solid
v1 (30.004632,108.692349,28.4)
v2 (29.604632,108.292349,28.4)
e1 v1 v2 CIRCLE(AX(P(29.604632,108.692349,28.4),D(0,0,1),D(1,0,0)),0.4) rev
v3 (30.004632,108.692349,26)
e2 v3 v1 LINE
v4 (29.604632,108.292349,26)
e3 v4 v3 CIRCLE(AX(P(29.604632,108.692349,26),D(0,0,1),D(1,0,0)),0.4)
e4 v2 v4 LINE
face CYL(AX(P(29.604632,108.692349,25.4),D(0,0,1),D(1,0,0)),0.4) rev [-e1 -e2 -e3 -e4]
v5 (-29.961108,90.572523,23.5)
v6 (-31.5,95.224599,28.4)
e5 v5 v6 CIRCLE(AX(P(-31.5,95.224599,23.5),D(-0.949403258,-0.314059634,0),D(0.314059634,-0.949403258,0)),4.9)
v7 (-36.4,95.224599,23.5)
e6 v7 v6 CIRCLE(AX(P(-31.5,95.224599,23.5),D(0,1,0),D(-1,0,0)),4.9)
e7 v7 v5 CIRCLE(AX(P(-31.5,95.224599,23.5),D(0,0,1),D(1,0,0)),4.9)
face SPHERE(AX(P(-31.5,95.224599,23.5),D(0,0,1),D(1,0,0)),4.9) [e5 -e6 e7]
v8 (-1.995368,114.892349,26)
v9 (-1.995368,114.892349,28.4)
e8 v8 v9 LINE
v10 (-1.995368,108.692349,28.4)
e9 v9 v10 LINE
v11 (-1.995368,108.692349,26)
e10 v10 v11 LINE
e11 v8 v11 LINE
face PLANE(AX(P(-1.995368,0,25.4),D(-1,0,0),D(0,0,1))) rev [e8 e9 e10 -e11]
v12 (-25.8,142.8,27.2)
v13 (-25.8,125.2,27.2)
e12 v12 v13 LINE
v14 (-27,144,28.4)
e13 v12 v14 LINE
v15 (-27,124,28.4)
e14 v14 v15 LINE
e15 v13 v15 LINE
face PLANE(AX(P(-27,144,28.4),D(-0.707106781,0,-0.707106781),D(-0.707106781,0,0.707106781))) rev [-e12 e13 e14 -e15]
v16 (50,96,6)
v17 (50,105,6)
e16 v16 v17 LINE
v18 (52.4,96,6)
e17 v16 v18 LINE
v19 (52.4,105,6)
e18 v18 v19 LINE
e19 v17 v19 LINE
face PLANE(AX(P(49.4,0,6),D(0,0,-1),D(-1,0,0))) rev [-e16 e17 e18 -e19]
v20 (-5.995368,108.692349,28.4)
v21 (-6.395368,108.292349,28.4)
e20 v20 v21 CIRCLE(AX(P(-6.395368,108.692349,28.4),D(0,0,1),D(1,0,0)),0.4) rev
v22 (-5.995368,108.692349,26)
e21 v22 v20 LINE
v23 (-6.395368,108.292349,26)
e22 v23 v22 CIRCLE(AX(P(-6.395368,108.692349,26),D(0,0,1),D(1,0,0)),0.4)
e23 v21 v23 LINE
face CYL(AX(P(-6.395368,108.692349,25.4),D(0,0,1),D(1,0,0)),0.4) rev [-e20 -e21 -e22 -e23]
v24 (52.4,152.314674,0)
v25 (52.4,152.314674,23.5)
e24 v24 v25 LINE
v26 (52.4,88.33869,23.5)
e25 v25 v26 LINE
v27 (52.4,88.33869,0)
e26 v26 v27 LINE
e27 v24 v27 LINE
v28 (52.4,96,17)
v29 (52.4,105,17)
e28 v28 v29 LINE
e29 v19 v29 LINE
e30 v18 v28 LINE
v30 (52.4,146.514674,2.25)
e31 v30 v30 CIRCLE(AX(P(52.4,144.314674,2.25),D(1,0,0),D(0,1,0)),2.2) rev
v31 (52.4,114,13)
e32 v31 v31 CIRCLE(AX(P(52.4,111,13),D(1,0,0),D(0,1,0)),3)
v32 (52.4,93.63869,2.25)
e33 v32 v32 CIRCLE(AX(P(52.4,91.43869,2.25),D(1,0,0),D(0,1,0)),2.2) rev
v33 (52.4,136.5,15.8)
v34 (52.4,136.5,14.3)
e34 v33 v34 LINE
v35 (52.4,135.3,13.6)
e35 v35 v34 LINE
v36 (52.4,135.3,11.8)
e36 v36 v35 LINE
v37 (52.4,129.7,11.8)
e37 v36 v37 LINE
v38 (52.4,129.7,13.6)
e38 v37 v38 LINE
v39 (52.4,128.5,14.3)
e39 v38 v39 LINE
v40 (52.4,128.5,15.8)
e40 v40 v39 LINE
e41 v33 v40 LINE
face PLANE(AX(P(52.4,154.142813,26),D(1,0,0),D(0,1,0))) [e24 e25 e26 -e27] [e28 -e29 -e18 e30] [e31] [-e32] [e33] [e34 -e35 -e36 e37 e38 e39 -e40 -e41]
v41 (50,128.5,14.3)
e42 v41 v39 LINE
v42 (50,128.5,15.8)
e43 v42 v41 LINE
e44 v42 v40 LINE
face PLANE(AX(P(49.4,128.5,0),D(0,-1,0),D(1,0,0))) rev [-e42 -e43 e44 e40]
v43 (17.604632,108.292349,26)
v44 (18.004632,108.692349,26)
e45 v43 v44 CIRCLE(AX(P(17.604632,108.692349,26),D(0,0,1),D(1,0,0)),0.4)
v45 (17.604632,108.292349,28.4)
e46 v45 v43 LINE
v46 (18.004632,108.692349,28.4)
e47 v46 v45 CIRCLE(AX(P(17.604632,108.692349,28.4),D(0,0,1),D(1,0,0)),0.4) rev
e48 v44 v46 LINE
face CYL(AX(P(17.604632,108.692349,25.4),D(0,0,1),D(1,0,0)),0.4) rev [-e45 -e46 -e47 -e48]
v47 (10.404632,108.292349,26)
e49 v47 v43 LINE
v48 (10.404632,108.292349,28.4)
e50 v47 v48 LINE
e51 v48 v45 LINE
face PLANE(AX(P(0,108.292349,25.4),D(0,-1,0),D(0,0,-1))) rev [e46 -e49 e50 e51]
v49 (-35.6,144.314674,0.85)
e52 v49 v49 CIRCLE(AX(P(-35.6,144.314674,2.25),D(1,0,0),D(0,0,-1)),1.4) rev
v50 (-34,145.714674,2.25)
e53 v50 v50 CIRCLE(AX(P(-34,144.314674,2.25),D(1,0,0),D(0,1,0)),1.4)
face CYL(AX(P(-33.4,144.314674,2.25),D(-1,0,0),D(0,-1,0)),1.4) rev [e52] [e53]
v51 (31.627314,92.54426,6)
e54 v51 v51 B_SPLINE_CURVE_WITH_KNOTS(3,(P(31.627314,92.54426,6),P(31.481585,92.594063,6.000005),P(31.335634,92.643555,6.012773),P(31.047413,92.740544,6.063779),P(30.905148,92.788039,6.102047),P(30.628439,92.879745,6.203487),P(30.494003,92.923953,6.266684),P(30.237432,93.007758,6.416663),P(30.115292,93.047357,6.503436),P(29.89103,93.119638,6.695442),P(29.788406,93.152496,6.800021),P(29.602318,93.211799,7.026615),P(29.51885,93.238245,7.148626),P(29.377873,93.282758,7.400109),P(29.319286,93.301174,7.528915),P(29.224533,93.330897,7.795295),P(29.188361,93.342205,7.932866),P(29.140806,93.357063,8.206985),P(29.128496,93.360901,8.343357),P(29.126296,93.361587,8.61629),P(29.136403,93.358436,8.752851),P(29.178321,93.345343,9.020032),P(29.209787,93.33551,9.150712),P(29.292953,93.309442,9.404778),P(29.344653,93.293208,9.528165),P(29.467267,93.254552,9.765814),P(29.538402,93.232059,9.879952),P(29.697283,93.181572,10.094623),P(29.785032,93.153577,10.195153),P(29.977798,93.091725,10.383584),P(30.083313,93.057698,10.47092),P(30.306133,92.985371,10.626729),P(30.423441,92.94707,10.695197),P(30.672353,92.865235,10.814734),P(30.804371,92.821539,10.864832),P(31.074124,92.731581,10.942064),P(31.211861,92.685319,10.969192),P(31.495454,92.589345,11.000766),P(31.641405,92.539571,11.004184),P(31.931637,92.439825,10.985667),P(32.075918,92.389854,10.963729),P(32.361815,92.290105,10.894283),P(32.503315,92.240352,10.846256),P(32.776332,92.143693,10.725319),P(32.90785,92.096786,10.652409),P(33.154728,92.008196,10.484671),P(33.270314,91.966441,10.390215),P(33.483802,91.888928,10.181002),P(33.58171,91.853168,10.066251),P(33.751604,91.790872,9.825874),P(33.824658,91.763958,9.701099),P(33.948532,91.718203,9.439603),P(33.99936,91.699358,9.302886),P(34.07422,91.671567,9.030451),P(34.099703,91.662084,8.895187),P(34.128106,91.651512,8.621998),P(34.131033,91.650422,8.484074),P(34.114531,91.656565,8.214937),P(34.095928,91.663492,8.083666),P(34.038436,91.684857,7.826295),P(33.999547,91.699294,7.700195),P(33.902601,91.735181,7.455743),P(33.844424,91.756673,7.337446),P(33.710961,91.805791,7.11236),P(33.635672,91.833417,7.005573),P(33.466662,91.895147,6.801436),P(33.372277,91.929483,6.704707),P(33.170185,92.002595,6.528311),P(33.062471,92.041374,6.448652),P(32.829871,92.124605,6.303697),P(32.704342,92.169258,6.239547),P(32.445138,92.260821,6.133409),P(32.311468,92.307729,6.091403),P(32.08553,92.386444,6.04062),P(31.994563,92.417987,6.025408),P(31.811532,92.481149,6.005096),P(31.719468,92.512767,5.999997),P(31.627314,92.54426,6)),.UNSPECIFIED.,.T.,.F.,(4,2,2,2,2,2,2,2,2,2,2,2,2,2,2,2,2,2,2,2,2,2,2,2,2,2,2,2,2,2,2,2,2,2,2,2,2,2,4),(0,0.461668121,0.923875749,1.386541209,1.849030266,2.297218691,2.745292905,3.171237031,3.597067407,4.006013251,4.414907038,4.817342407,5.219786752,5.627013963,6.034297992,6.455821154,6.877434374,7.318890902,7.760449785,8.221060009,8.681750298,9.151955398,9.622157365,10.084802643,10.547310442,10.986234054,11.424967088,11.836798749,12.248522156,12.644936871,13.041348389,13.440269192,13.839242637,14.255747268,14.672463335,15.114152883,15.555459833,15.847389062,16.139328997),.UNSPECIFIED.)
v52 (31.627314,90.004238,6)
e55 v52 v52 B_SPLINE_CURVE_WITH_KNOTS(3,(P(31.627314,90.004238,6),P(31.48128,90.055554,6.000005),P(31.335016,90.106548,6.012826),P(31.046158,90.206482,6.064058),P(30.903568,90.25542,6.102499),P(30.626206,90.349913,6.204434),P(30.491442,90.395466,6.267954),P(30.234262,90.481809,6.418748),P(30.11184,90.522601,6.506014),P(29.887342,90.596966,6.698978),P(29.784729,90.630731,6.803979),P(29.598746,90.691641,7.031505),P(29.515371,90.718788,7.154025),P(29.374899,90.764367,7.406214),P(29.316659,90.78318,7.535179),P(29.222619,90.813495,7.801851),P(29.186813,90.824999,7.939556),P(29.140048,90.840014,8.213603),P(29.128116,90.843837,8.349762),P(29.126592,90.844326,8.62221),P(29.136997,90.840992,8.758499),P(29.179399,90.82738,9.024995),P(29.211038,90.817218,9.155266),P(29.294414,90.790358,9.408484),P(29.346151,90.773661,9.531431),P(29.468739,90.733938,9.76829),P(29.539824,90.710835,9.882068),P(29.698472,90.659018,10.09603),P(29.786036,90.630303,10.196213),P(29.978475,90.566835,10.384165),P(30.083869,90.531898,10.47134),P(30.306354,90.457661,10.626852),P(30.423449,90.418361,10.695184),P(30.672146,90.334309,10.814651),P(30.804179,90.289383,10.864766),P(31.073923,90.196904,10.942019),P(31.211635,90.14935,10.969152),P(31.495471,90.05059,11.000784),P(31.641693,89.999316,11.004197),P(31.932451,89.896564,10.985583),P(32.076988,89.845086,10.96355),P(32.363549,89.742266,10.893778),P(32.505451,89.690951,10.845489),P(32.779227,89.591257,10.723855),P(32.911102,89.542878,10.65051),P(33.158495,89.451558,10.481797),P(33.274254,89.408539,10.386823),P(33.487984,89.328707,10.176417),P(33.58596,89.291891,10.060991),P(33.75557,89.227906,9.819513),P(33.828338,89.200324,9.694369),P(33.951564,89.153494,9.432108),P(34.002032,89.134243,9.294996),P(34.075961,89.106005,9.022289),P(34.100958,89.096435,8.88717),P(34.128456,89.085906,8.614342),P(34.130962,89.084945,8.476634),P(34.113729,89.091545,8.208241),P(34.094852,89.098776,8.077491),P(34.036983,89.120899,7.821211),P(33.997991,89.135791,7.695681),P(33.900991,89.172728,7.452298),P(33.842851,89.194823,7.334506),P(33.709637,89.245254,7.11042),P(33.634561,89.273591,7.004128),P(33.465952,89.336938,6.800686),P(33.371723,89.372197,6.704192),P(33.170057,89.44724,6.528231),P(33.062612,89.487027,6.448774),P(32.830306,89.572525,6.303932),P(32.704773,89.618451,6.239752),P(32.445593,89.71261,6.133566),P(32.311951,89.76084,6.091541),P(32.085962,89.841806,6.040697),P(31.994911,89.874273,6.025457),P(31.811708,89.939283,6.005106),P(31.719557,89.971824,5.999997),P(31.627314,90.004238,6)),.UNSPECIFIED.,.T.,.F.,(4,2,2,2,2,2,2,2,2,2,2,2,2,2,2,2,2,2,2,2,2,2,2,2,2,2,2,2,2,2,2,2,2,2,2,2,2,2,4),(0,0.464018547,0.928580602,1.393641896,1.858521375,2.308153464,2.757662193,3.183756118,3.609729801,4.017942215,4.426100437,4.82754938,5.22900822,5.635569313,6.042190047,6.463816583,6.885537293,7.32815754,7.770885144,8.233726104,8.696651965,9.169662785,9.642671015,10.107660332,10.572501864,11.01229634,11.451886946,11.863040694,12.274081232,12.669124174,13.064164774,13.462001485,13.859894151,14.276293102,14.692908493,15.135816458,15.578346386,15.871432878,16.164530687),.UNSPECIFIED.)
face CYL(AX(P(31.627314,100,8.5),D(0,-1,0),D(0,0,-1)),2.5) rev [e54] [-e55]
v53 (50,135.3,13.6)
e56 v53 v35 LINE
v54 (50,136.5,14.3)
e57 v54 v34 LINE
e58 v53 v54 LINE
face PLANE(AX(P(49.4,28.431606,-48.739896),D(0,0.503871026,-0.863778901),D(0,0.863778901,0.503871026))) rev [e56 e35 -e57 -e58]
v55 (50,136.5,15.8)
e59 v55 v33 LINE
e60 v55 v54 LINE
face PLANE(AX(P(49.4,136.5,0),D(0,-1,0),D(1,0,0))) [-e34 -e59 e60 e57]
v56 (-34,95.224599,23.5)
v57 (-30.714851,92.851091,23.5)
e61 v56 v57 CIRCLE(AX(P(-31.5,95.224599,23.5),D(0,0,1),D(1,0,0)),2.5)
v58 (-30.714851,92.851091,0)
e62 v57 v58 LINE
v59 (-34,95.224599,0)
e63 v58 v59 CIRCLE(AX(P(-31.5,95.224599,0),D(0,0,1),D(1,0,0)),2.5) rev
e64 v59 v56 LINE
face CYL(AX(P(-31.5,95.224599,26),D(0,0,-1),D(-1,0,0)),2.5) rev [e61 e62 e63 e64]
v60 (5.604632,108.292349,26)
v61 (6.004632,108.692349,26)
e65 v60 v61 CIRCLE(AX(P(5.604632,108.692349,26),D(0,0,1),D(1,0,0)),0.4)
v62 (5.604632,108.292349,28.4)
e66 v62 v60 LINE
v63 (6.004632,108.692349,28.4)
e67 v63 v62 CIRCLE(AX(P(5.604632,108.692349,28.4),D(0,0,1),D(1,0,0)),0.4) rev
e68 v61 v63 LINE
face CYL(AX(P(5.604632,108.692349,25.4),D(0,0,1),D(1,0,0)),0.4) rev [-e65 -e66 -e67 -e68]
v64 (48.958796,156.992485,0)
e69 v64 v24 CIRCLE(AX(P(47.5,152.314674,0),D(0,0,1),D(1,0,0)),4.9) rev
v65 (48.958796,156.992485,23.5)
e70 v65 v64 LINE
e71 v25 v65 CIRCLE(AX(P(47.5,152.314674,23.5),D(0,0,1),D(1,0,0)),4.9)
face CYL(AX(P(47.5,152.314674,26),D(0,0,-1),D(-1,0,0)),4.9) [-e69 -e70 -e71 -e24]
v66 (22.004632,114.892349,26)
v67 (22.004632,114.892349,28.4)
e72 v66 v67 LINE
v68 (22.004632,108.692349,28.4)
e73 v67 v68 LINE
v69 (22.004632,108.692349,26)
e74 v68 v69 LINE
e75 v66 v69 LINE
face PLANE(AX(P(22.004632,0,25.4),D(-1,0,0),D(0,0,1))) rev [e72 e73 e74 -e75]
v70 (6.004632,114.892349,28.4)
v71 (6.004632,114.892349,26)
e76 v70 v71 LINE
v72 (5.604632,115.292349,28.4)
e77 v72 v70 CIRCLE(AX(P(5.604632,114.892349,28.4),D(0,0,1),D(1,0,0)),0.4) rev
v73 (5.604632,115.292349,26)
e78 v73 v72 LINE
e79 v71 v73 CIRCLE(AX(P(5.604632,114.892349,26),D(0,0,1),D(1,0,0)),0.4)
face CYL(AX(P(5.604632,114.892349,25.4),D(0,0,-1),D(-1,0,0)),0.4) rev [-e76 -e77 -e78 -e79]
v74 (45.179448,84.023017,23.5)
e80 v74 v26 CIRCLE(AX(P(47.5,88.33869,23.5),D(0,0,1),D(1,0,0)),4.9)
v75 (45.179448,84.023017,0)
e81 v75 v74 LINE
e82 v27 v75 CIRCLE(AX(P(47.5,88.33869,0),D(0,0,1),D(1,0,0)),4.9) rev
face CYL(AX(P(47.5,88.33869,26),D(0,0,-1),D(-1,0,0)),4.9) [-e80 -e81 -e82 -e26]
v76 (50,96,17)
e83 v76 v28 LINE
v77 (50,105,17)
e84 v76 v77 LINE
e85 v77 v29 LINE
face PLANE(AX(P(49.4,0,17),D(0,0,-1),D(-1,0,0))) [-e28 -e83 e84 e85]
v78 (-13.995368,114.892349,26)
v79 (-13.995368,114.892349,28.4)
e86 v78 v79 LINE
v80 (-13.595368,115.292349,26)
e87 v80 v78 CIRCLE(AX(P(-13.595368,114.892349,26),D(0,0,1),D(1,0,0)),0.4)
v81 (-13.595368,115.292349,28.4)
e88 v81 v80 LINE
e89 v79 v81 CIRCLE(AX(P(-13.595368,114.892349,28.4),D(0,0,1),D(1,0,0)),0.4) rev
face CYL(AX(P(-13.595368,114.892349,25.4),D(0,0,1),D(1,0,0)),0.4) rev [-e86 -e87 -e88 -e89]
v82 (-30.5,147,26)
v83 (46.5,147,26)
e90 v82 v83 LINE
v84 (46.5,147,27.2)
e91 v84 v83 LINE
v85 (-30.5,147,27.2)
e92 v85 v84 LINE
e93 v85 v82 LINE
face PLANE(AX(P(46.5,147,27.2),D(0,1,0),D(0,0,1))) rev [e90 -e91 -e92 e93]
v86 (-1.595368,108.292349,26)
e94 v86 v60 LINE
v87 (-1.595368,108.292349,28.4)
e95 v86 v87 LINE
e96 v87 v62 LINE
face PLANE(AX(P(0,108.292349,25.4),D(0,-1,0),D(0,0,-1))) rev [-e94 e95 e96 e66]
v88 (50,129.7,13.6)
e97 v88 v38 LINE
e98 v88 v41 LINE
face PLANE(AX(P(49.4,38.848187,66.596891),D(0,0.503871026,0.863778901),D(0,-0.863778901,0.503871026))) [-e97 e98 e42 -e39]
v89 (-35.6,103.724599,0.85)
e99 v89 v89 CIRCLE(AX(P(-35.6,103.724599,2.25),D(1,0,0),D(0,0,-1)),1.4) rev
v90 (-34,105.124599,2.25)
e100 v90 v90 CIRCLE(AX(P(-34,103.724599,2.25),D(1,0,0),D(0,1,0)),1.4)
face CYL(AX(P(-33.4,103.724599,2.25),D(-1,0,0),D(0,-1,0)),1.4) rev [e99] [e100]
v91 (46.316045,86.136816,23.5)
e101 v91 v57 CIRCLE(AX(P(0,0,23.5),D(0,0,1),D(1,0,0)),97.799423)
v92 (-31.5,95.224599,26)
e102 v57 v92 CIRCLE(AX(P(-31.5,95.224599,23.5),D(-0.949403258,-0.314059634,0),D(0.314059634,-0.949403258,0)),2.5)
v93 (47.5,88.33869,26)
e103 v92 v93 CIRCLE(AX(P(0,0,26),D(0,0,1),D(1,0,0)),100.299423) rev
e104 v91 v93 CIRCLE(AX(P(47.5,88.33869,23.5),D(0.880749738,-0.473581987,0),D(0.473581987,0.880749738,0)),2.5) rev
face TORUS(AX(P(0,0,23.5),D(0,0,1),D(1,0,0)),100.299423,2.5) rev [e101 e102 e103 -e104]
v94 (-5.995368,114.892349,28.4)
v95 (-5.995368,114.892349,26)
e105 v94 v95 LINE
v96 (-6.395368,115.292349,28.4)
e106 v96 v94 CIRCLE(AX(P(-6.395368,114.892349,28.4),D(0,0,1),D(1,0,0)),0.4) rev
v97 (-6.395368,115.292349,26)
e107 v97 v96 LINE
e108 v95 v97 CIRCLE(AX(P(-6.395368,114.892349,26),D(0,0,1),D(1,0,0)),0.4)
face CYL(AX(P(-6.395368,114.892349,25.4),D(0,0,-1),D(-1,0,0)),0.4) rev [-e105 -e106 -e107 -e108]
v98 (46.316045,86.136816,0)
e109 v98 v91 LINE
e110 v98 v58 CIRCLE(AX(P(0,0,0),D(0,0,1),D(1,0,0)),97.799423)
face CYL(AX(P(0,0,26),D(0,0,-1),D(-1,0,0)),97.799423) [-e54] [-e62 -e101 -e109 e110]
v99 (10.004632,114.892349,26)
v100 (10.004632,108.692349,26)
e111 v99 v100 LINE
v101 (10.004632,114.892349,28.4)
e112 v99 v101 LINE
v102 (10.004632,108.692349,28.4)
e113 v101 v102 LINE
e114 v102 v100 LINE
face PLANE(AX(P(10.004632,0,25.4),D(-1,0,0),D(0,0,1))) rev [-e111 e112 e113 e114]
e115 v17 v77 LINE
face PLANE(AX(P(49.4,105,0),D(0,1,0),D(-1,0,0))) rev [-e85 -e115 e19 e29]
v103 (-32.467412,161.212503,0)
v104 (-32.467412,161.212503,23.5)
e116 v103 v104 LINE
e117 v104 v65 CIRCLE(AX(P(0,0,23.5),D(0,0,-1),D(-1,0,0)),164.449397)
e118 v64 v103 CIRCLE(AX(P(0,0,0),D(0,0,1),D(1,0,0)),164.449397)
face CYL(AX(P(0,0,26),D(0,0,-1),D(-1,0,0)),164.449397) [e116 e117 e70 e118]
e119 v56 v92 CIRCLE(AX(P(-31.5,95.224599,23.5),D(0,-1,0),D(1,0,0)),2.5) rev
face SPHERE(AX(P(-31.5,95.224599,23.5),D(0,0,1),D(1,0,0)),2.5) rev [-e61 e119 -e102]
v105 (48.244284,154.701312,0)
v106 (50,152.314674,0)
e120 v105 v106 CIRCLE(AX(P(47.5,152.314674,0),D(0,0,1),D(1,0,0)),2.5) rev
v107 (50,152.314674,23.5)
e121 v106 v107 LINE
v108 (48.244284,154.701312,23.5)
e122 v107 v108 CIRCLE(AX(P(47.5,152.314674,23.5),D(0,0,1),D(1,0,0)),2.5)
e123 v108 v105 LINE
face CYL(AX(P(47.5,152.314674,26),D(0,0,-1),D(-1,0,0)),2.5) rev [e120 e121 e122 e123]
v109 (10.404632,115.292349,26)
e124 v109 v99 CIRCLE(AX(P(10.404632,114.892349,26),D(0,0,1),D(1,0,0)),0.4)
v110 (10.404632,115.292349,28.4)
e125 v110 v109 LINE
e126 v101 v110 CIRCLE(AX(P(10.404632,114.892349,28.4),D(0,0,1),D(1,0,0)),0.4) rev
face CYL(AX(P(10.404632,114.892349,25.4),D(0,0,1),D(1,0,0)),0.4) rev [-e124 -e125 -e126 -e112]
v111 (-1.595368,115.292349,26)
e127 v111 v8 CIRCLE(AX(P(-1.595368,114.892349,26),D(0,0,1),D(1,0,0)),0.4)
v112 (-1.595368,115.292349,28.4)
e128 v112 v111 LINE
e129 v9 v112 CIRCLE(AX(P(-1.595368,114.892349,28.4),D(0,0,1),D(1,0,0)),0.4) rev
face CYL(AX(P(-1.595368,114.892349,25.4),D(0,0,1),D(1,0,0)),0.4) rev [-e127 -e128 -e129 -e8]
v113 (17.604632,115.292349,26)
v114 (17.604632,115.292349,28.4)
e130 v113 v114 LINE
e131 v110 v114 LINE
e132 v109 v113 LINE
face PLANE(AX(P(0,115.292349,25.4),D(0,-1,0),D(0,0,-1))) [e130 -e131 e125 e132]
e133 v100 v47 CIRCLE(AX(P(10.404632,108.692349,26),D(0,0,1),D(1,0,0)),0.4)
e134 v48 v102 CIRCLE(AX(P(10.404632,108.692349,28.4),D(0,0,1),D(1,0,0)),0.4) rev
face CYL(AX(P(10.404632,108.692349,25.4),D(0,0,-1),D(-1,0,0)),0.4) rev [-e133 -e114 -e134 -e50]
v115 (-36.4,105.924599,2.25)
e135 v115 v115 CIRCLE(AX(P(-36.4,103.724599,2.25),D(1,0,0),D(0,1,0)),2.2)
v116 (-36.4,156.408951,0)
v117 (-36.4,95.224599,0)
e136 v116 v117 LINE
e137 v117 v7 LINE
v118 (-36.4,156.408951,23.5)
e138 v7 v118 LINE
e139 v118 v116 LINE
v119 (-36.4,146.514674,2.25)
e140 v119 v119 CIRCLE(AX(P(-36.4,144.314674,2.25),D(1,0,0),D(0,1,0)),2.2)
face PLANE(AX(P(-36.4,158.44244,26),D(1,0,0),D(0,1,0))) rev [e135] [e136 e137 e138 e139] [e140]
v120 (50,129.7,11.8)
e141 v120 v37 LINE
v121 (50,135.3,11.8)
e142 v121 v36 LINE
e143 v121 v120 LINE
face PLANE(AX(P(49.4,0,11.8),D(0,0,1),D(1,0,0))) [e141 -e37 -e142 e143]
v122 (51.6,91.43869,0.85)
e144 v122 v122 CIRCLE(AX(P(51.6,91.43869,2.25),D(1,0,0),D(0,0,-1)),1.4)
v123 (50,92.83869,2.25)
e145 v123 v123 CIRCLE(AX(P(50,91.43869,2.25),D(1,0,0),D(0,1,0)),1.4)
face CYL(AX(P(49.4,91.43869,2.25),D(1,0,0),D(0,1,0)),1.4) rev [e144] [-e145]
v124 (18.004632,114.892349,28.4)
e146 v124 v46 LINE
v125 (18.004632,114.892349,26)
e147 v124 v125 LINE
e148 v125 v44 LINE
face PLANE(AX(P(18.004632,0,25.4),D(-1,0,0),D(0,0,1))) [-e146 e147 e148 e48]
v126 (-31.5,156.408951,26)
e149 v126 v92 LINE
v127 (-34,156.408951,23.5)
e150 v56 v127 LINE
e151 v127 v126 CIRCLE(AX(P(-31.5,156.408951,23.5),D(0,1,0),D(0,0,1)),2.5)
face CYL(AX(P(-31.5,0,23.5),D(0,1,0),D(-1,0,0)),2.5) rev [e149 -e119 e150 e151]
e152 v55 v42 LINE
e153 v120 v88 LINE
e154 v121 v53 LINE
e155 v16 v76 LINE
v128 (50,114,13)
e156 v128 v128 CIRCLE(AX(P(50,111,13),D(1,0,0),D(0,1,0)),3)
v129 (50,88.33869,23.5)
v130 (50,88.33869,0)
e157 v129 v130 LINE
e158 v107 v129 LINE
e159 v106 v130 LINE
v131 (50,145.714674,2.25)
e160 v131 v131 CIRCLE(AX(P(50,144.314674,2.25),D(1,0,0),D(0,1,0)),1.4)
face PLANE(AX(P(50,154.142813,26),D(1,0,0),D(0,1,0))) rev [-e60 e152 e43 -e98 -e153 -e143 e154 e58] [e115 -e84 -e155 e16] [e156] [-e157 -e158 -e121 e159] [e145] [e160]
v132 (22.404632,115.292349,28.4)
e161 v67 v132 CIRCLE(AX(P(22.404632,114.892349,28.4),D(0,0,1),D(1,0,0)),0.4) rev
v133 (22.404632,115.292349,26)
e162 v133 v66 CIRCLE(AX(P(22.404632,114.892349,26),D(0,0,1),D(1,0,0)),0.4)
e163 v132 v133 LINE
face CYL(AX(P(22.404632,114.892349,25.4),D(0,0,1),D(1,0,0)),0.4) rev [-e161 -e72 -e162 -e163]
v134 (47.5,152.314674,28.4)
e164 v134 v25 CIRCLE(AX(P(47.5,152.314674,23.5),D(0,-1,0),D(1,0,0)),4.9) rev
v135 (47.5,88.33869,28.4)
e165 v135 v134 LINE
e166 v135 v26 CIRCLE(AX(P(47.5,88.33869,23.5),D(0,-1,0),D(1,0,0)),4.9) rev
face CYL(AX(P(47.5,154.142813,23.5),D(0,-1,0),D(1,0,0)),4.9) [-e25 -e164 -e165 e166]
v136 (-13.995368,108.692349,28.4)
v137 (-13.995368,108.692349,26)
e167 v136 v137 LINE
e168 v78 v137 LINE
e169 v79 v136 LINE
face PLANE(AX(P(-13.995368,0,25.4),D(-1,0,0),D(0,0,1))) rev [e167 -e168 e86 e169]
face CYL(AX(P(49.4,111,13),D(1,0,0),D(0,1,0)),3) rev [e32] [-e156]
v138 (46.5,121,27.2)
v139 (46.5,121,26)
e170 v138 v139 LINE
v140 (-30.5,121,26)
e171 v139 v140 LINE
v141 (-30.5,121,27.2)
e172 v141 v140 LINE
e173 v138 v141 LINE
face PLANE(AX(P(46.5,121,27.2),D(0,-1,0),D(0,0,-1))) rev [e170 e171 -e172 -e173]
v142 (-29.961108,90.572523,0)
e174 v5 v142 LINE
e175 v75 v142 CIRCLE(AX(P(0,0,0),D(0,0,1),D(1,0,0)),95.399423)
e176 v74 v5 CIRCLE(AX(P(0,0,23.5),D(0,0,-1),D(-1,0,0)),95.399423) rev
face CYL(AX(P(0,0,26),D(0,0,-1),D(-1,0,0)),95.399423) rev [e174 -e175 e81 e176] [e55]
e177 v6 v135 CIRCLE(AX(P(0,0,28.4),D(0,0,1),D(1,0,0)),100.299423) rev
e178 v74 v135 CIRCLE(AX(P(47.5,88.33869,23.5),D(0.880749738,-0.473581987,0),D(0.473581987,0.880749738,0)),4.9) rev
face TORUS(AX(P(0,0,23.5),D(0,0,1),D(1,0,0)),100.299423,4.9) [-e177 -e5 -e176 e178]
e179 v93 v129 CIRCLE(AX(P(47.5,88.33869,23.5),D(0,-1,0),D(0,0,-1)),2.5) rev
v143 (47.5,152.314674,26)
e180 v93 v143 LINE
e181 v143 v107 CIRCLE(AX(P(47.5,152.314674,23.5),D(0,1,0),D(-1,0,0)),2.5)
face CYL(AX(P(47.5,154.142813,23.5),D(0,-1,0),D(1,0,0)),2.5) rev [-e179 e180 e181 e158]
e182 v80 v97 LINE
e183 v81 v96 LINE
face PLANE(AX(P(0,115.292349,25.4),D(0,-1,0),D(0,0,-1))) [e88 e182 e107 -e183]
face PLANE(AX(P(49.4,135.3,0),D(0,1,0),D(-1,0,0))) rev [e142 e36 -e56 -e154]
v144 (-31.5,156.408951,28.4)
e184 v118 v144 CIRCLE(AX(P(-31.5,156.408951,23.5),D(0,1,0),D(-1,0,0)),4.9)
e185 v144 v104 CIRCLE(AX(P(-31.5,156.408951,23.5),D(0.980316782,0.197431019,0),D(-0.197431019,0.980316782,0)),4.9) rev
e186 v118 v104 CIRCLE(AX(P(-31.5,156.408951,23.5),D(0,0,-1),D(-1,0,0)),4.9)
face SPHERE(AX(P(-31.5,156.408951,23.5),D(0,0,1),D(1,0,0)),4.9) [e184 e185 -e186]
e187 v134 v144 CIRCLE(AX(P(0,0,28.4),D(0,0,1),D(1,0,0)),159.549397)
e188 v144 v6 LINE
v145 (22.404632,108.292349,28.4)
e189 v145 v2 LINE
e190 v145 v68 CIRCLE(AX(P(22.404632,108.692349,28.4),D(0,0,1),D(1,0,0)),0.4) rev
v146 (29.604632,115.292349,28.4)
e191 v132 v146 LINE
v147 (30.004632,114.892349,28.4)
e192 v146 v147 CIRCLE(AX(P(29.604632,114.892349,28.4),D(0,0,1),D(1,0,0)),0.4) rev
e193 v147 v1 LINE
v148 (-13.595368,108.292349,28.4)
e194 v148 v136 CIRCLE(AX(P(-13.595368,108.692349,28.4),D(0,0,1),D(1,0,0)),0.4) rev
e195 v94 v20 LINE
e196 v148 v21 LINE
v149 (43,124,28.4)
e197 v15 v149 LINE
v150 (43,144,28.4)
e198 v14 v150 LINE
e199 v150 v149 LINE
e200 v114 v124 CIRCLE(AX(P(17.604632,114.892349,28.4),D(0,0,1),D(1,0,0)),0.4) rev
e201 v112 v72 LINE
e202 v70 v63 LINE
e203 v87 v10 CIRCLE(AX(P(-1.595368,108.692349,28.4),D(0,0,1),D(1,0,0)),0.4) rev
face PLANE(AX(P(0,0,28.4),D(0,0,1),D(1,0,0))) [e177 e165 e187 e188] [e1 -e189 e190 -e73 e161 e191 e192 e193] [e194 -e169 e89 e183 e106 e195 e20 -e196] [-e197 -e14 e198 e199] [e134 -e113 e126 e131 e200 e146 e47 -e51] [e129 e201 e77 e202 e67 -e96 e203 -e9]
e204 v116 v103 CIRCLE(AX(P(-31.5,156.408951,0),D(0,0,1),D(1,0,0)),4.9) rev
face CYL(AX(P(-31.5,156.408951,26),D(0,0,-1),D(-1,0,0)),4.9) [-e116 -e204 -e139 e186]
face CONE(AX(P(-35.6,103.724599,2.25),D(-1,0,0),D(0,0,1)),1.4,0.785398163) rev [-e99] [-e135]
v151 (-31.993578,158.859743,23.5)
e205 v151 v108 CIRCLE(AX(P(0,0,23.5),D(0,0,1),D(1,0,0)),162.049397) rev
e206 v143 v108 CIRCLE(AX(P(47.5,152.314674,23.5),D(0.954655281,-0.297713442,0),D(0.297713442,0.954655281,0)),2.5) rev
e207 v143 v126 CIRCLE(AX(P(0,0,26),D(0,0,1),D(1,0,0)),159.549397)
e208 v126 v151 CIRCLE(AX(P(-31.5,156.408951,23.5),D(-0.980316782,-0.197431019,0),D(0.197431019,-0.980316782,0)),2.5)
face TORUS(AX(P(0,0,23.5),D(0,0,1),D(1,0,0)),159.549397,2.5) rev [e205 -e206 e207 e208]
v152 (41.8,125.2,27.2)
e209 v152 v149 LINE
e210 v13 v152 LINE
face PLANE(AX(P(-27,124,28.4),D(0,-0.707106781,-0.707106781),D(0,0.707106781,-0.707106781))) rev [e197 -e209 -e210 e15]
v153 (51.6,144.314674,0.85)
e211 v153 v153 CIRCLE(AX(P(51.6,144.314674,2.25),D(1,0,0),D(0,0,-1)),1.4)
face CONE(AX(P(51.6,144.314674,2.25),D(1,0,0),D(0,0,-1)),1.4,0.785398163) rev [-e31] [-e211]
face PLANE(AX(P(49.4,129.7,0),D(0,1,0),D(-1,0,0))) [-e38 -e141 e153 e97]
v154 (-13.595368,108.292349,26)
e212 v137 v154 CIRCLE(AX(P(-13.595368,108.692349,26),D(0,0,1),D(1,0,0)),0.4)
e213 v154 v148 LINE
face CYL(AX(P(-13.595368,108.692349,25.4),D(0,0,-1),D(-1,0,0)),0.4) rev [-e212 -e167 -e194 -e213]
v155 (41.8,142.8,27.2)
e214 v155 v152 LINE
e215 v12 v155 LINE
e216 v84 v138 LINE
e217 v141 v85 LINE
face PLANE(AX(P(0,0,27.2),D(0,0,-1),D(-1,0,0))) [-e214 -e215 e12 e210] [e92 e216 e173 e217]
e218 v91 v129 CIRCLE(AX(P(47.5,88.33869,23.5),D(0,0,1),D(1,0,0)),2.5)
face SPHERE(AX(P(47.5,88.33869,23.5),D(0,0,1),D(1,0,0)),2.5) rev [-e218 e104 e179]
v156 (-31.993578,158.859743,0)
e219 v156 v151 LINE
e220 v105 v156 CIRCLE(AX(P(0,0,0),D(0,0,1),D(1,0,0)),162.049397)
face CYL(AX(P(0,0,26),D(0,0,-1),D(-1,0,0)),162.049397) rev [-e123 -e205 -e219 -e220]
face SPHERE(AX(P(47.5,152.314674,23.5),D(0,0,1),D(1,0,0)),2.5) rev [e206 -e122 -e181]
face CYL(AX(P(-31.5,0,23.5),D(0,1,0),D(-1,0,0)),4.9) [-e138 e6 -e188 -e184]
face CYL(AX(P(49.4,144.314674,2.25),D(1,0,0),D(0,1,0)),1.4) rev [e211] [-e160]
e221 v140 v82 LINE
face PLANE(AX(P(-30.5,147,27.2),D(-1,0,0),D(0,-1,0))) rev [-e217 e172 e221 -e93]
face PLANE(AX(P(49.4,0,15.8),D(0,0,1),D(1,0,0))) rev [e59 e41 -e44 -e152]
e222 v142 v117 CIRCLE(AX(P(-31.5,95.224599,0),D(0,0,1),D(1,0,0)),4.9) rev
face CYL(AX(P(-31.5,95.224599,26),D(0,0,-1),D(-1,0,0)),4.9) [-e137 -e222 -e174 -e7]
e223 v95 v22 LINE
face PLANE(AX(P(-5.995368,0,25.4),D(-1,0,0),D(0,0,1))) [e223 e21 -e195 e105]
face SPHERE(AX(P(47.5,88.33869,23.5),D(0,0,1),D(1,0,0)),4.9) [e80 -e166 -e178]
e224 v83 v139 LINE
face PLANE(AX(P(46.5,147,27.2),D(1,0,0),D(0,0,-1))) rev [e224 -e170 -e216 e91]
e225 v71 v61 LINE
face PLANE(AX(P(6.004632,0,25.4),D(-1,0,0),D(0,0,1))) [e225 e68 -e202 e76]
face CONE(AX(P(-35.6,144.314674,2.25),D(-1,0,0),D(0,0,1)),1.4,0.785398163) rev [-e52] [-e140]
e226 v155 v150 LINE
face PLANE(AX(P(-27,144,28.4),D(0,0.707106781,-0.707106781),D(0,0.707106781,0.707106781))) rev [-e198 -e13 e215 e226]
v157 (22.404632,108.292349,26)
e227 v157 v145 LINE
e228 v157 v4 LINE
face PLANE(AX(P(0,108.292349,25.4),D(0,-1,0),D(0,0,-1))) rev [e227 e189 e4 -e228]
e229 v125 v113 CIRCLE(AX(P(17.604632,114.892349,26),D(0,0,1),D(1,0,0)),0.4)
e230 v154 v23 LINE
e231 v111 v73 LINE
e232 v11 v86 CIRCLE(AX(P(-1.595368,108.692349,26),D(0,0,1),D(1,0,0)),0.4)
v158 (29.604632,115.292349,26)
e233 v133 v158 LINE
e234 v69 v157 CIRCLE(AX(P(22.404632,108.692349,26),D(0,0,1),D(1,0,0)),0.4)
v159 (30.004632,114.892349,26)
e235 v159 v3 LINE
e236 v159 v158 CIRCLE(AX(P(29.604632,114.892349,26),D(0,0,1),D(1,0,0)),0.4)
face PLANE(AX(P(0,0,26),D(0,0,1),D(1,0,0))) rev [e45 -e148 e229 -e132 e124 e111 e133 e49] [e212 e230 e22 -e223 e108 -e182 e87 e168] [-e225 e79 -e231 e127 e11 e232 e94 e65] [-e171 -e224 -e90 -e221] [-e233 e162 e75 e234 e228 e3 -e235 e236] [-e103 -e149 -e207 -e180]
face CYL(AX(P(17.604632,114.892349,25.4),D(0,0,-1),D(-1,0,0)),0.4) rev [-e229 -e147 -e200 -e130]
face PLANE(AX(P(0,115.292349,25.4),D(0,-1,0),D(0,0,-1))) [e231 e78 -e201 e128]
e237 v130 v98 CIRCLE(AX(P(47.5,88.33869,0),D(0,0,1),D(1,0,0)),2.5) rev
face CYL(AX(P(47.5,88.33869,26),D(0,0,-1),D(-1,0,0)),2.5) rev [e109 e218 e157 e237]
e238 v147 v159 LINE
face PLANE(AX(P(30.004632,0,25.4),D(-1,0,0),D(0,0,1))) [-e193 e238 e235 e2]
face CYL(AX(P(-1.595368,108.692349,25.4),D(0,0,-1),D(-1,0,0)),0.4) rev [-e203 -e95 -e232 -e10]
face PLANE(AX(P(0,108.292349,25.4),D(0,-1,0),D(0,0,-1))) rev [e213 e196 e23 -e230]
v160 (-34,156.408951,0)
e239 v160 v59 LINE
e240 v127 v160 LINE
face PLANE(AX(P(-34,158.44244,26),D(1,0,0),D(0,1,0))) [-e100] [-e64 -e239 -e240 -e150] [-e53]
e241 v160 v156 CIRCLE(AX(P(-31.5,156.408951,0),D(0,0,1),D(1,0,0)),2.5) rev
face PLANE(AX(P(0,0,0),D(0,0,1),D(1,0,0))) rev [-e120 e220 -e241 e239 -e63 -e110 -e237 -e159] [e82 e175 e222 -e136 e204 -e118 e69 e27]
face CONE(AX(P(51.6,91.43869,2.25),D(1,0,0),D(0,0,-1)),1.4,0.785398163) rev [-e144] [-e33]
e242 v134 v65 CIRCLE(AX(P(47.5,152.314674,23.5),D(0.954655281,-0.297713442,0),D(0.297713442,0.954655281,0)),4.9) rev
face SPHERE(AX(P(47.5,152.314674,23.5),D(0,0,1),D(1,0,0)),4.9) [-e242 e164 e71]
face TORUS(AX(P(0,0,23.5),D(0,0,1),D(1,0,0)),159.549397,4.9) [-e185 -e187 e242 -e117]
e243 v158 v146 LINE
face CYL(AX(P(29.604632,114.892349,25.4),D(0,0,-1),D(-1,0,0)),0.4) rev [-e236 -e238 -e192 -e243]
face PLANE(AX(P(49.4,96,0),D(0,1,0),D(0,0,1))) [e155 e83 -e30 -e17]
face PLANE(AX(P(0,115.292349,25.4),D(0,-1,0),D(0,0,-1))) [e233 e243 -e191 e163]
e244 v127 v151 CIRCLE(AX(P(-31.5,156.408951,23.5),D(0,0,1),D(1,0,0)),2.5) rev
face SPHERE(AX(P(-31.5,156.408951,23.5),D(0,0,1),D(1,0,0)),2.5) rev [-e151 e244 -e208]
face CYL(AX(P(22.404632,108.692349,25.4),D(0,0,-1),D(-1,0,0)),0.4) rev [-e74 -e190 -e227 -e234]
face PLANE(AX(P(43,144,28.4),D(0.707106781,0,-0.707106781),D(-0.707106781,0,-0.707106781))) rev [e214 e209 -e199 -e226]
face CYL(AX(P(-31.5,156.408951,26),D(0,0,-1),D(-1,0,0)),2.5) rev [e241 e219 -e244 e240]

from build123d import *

# Parameters (mm, degrees)
EXTRUDE_11098_DEPTH         = 26
FILLET_11147_R              = 2.5
SHELL_11558_T               = 2.4
SKETCH_12788_W              = 77
SKETCH_12788_H              = 26
CUT_EXTRUDE_13245_DEPTH     = 1.2
CUT_EXTRUDE_START           = -2.4
CUT_EXTRUDE_14712_OUTLINE_W = 8
CUT_EXTRUDE_14712_OUTLINE_H = 7
CUT_EXTRUDE_14712_DEPTH     = 2.4
CUT_EXTRUDE_START_2         = -3
CUT_EXTRUDE_16699_OUTLINE_W = 11
CUT_EXTRUDE_16699_OUTLINE_H = 9
CUT_EXTRUDE_16699_OUTLINE_R = 3
CUT_EXTRUDE_16699_DEPTH     = 4
SKETCH_16755_R              = 1.4
CUT_EXTRUDE_17028_DEPTH     = 3
SKETCH_17076_R              = 1.4
CUT_EXTRUDE_17283_DEPTH     = 3
CHAMFER_17332_SIZE          = 0.8
FILLET_1_R                  = 0.4
SKETCH_19008_R              = 2.5
CUT_EXTRUDE_19107_DEPTH     = 100


with BuildPart() as part:
    # Extrude 11098: read off the stored shape, not the designer's step
    # Extrude 11098 outline → Extrude 11098 (new body)
    with BuildSketch(Plane.XY):
        with BuildLine():
            ThreePointArc((50, 154.142813358), (8.283821468, 161.837527205), (-34, 158.442440368))
            Line((-34, 158.442440368), (-34, 91.699111876))
            ThreePointArc((-34, 91.699111876), (8.866783155, 97.3966492), (50, 84.051931084))
            Line((50, 84.051931084), (50, 154.142813358))
        make_face()
    extrude(amount=EXTRUDE_11098_DEPTH)

    # Fillet 11147
    fillet_11147_edges = [part.edges().sort_by_distance(p)[0] for p in [
        (8.866783155, 97.3966492, 26),
        (50, 119.097372221, 26),
        (8.283821468, 161.837527205, 26),
        (50, 154.142813358, 13),
        (50, 84.051931084, 13),
        (-34, 91.699111876, 13),
        (-34, 158.442440368, 13),
        (-34, 125.070776122, 26),
    ]]
    fillet(fillet_11147_edges, radius=FILLET_11147_R)

    # Shell 11558
    shell_11558_openings = [part.faces().sort_by_distance(p)[0] for p in [
        (8.321154323, 127.154130668, 0),
    ]]
    offset(amount=SHELL_11558_T, openings=shell_11558_openings, kind=Kind.INTERSECTION)

    # Cut-Extrude 12697: read off the stored shape, not the designer's step
    # Cut-Extrude 12697: loft between two sections, ruled curve by curve
    cut_extrude_12697_from = [
        Edge.make_line((-24.6, 126.4, 26), (40.6, 126.4, 26)),
        Edge.make_line((-24.6, 141.6, 26), (-24.6, 126.4, 26)),
        Edge.make_line((40.6, 141.6, 26), (-24.6, 141.6, 26)),
        Edge.make_line((40.6, 126.4, 26), (40.6, 141.6, 26)),
    ]
    cut_extrude_12697_to = [
        Edge.make_line((-27, 124, 28.4), (43, 124, 28.4)),
        Edge.make_line((-27, 144, 28.4), (-27, 124, 28.4)),
        Edge.make_line((43, 144, 28.4), (-27, 144, 28.4)),
        Edge.make_line((43, 124, 28.4), (43, 144, 28.4)),
    ]
    cut_extrude_12697 = Solid(Shell([*[Face.make_surface_from_curves(cut_extrude_12697_from[k], cut_extrude_12697_to[k]) for k in range(4)], Face(Wire(cut_extrude_12697_from)), Face(Wire(cut_extrude_12697_to))]))
    add(cut_extrude_12697, mode=Mode.SUBTRACT)

    # Sketch 12788 → Cut-Extrude 13245 (cut)
    with BuildSketch(Plane(origin=(0, 0, 26), x_dir=(-1, 0, 0), z_dir=(0, 0, -1))):
        with Locations((-8, 134)):
            Rectangle(SKETCH_12788_W, SKETCH_12788_H)
    extrude(amount=-CUT_EXTRUDE_13245_DEPTH, mode=Mode.SUBTRACT)

    # Cut-Extrude 14712: read off the stored shape, not the designer's step
    # Cut-Extrude 14712 outline → Cut-Extrude 14712 (cut)
    with BuildSketch(Plane.XY.offset(28.4).offset(CUT_EXTRUDE_START)):
        with Locations((26.004631823, 111.792348678)):
            Rectangle(CUT_EXTRUDE_14712_OUTLINE_W, CUT_EXTRUDE_14712_OUTLINE_H)
        with Locations((14.004631823, 111.792348678)):
            Rectangle(CUT_EXTRUDE_14712_OUTLINE_W, CUT_EXTRUDE_14712_OUTLINE_H)
        with Locations((2.004631823, 111.792348678)):
            Rectangle(CUT_EXTRUDE_14712_OUTLINE_W, CUT_EXTRUDE_14712_OUTLINE_H)
        with Locations((-9.995368177, 111.792348678)):
            Rectangle(CUT_EXTRUDE_14712_OUTLINE_W, CUT_EXTRUDE_14712_OUTLINE_H)
    extrude(amount=CUT_EXTRUDE_14712_DEPTH, mode=Mode.SUBTRACT)

    # Cut-Extrude 16699: read off the stored shape, not the designer's step
    # Cut-Extrude 16699 outline → Cut-Extrude 16699 (cut)
    with BuildSketch(Plane(origin=(52.4, 0, 0), x_dir=(0, 0, -1), z_dir=(1, 0, 0)).offset(CUT_EXTRUDE_START_2)):
        with Locations((-11.5, 100.5)):
            Rectangle(CUT_EXTRUDE_16699_OUTLINE_W, CUT_EXTRUDE_16699_OUTLINE_H)
        with Locations((-13, 111)):
            Circle(CUT_EXTRUDE_16699_OUTLINE_R)
        Polygon((-14.3, 128.5), (-13.6, 129.7), (-11.8, 129.7), (-11.8, 135.3), (-13.6, 135.3), (-14.3, 136.5), (-15.8, 136.5), (-15.8, 128.5), align=None)
    extrude(amount=CUT_EXTRUDE_16699_DEPTH, mode=Mode.SUBTRACT)

    # Sketch 16755 → Cut-Extrude 17028 (cut)
    with BuildSketch(Plane(origin=(52.4, 0, 0), x_dir=(0, 0, -1), z_dir=(1, 0, 0))):
        with Locations(Location((-2.25, 91.438690467, 0), (0, 0, 90))):
            Circle(SKETCH_16755_R)
        with Locations(Location((-2.25, 144.314674038, 0), (0, 0, 90))):
            Circle(SKETCH_16755_R)
    extrude(amount=-CUT_EXTRUDE_17028_DEPTH, mode=Mode.SUBTRACT)

    # Sketch 17076 → Cut-Extrude 17283 (cut)
    with BuildSketch(Plane.ZY.offset(36.4).offset(CUT_EXTRUDE_START_2)):
        with Locations(Location((2.25, 103.724598888, 0), (0, 0, 270))):
            Circle(SKETCH_17076_R)
        with Locations(Location((2.25, 144.314674038, 0), (0, 0, 90))):
            Circle(SKETCH_17076_R)
    extrude(amount=CUT_EXTRUDE_17283_DEPTH, mode=Mode.SUBTRACT)

    # Chamfer 17332
    chamfer_17332_edges = [part.edges().sort_by_distance(p)[0] for p in [
        (52.4, 90.038690467, 2.25),
        (52.4, 142.914674038, 2.25),
        (-36.4, 142.914674038, 2.25),
        (-36.4, 105.124598888, 2.25),
    ]]
    chamfer(chamfer_17332_edges, length=CHAMFER_17332_SIZE)

    # Скругление1
    fillet_1_edges = [part.edges().sort_by_distance(p)[0] for p in [
        (-5.995368177, 115.292348678, 27.2),
        (-5.995368177, 108.292348678, 27.2),
        (-13.995368177, 108.292348678, 27.2),
        (-13.995368177, 115.292348678, 27.2),
        (-1.995368177, 108.292348678, 27.2),
        (-1.995368177, 115.292348678, 27.2),
        (6.004631823, 115.292348678, 27.2),
        (6.004631823, 108.292348678, 27.2),
        (10.004631823, 108.292348678, 27.2),
        (10.004631823, 115.292348678, 27.2),
        (18.004631823, 115.292348678, 27.2),
        (18.004631823, 108.292348678, 27.2),
        (22.004631823, 108.292348678, 27.2),
        (22.004631823, 115.292348678, 27.2),
        (30.004631823, 115.292348678, 27.2),
        (30.004631823, 108.292348678, 27.2),
    ]]
    fillet(fillet_1_edges, radius=FILLET_1_R)

    # Sketch 19008 → Cut-Extrude 19107 (cut)
    with BuildSketch(Plane(origin=(0, 0, 0), x_dir=(1, 0, 0), z_dir=(0, 1, 0))):
        with Locations(Location((31.62731448, -8.5, 0), (0, 0, 90))):
            Circle(SKETCH_19008_R)
    extrude(amount=CUT_EXTRUDE_19107_DEPTH, mode=Mode.SUBTRACT)


solid = part.part
